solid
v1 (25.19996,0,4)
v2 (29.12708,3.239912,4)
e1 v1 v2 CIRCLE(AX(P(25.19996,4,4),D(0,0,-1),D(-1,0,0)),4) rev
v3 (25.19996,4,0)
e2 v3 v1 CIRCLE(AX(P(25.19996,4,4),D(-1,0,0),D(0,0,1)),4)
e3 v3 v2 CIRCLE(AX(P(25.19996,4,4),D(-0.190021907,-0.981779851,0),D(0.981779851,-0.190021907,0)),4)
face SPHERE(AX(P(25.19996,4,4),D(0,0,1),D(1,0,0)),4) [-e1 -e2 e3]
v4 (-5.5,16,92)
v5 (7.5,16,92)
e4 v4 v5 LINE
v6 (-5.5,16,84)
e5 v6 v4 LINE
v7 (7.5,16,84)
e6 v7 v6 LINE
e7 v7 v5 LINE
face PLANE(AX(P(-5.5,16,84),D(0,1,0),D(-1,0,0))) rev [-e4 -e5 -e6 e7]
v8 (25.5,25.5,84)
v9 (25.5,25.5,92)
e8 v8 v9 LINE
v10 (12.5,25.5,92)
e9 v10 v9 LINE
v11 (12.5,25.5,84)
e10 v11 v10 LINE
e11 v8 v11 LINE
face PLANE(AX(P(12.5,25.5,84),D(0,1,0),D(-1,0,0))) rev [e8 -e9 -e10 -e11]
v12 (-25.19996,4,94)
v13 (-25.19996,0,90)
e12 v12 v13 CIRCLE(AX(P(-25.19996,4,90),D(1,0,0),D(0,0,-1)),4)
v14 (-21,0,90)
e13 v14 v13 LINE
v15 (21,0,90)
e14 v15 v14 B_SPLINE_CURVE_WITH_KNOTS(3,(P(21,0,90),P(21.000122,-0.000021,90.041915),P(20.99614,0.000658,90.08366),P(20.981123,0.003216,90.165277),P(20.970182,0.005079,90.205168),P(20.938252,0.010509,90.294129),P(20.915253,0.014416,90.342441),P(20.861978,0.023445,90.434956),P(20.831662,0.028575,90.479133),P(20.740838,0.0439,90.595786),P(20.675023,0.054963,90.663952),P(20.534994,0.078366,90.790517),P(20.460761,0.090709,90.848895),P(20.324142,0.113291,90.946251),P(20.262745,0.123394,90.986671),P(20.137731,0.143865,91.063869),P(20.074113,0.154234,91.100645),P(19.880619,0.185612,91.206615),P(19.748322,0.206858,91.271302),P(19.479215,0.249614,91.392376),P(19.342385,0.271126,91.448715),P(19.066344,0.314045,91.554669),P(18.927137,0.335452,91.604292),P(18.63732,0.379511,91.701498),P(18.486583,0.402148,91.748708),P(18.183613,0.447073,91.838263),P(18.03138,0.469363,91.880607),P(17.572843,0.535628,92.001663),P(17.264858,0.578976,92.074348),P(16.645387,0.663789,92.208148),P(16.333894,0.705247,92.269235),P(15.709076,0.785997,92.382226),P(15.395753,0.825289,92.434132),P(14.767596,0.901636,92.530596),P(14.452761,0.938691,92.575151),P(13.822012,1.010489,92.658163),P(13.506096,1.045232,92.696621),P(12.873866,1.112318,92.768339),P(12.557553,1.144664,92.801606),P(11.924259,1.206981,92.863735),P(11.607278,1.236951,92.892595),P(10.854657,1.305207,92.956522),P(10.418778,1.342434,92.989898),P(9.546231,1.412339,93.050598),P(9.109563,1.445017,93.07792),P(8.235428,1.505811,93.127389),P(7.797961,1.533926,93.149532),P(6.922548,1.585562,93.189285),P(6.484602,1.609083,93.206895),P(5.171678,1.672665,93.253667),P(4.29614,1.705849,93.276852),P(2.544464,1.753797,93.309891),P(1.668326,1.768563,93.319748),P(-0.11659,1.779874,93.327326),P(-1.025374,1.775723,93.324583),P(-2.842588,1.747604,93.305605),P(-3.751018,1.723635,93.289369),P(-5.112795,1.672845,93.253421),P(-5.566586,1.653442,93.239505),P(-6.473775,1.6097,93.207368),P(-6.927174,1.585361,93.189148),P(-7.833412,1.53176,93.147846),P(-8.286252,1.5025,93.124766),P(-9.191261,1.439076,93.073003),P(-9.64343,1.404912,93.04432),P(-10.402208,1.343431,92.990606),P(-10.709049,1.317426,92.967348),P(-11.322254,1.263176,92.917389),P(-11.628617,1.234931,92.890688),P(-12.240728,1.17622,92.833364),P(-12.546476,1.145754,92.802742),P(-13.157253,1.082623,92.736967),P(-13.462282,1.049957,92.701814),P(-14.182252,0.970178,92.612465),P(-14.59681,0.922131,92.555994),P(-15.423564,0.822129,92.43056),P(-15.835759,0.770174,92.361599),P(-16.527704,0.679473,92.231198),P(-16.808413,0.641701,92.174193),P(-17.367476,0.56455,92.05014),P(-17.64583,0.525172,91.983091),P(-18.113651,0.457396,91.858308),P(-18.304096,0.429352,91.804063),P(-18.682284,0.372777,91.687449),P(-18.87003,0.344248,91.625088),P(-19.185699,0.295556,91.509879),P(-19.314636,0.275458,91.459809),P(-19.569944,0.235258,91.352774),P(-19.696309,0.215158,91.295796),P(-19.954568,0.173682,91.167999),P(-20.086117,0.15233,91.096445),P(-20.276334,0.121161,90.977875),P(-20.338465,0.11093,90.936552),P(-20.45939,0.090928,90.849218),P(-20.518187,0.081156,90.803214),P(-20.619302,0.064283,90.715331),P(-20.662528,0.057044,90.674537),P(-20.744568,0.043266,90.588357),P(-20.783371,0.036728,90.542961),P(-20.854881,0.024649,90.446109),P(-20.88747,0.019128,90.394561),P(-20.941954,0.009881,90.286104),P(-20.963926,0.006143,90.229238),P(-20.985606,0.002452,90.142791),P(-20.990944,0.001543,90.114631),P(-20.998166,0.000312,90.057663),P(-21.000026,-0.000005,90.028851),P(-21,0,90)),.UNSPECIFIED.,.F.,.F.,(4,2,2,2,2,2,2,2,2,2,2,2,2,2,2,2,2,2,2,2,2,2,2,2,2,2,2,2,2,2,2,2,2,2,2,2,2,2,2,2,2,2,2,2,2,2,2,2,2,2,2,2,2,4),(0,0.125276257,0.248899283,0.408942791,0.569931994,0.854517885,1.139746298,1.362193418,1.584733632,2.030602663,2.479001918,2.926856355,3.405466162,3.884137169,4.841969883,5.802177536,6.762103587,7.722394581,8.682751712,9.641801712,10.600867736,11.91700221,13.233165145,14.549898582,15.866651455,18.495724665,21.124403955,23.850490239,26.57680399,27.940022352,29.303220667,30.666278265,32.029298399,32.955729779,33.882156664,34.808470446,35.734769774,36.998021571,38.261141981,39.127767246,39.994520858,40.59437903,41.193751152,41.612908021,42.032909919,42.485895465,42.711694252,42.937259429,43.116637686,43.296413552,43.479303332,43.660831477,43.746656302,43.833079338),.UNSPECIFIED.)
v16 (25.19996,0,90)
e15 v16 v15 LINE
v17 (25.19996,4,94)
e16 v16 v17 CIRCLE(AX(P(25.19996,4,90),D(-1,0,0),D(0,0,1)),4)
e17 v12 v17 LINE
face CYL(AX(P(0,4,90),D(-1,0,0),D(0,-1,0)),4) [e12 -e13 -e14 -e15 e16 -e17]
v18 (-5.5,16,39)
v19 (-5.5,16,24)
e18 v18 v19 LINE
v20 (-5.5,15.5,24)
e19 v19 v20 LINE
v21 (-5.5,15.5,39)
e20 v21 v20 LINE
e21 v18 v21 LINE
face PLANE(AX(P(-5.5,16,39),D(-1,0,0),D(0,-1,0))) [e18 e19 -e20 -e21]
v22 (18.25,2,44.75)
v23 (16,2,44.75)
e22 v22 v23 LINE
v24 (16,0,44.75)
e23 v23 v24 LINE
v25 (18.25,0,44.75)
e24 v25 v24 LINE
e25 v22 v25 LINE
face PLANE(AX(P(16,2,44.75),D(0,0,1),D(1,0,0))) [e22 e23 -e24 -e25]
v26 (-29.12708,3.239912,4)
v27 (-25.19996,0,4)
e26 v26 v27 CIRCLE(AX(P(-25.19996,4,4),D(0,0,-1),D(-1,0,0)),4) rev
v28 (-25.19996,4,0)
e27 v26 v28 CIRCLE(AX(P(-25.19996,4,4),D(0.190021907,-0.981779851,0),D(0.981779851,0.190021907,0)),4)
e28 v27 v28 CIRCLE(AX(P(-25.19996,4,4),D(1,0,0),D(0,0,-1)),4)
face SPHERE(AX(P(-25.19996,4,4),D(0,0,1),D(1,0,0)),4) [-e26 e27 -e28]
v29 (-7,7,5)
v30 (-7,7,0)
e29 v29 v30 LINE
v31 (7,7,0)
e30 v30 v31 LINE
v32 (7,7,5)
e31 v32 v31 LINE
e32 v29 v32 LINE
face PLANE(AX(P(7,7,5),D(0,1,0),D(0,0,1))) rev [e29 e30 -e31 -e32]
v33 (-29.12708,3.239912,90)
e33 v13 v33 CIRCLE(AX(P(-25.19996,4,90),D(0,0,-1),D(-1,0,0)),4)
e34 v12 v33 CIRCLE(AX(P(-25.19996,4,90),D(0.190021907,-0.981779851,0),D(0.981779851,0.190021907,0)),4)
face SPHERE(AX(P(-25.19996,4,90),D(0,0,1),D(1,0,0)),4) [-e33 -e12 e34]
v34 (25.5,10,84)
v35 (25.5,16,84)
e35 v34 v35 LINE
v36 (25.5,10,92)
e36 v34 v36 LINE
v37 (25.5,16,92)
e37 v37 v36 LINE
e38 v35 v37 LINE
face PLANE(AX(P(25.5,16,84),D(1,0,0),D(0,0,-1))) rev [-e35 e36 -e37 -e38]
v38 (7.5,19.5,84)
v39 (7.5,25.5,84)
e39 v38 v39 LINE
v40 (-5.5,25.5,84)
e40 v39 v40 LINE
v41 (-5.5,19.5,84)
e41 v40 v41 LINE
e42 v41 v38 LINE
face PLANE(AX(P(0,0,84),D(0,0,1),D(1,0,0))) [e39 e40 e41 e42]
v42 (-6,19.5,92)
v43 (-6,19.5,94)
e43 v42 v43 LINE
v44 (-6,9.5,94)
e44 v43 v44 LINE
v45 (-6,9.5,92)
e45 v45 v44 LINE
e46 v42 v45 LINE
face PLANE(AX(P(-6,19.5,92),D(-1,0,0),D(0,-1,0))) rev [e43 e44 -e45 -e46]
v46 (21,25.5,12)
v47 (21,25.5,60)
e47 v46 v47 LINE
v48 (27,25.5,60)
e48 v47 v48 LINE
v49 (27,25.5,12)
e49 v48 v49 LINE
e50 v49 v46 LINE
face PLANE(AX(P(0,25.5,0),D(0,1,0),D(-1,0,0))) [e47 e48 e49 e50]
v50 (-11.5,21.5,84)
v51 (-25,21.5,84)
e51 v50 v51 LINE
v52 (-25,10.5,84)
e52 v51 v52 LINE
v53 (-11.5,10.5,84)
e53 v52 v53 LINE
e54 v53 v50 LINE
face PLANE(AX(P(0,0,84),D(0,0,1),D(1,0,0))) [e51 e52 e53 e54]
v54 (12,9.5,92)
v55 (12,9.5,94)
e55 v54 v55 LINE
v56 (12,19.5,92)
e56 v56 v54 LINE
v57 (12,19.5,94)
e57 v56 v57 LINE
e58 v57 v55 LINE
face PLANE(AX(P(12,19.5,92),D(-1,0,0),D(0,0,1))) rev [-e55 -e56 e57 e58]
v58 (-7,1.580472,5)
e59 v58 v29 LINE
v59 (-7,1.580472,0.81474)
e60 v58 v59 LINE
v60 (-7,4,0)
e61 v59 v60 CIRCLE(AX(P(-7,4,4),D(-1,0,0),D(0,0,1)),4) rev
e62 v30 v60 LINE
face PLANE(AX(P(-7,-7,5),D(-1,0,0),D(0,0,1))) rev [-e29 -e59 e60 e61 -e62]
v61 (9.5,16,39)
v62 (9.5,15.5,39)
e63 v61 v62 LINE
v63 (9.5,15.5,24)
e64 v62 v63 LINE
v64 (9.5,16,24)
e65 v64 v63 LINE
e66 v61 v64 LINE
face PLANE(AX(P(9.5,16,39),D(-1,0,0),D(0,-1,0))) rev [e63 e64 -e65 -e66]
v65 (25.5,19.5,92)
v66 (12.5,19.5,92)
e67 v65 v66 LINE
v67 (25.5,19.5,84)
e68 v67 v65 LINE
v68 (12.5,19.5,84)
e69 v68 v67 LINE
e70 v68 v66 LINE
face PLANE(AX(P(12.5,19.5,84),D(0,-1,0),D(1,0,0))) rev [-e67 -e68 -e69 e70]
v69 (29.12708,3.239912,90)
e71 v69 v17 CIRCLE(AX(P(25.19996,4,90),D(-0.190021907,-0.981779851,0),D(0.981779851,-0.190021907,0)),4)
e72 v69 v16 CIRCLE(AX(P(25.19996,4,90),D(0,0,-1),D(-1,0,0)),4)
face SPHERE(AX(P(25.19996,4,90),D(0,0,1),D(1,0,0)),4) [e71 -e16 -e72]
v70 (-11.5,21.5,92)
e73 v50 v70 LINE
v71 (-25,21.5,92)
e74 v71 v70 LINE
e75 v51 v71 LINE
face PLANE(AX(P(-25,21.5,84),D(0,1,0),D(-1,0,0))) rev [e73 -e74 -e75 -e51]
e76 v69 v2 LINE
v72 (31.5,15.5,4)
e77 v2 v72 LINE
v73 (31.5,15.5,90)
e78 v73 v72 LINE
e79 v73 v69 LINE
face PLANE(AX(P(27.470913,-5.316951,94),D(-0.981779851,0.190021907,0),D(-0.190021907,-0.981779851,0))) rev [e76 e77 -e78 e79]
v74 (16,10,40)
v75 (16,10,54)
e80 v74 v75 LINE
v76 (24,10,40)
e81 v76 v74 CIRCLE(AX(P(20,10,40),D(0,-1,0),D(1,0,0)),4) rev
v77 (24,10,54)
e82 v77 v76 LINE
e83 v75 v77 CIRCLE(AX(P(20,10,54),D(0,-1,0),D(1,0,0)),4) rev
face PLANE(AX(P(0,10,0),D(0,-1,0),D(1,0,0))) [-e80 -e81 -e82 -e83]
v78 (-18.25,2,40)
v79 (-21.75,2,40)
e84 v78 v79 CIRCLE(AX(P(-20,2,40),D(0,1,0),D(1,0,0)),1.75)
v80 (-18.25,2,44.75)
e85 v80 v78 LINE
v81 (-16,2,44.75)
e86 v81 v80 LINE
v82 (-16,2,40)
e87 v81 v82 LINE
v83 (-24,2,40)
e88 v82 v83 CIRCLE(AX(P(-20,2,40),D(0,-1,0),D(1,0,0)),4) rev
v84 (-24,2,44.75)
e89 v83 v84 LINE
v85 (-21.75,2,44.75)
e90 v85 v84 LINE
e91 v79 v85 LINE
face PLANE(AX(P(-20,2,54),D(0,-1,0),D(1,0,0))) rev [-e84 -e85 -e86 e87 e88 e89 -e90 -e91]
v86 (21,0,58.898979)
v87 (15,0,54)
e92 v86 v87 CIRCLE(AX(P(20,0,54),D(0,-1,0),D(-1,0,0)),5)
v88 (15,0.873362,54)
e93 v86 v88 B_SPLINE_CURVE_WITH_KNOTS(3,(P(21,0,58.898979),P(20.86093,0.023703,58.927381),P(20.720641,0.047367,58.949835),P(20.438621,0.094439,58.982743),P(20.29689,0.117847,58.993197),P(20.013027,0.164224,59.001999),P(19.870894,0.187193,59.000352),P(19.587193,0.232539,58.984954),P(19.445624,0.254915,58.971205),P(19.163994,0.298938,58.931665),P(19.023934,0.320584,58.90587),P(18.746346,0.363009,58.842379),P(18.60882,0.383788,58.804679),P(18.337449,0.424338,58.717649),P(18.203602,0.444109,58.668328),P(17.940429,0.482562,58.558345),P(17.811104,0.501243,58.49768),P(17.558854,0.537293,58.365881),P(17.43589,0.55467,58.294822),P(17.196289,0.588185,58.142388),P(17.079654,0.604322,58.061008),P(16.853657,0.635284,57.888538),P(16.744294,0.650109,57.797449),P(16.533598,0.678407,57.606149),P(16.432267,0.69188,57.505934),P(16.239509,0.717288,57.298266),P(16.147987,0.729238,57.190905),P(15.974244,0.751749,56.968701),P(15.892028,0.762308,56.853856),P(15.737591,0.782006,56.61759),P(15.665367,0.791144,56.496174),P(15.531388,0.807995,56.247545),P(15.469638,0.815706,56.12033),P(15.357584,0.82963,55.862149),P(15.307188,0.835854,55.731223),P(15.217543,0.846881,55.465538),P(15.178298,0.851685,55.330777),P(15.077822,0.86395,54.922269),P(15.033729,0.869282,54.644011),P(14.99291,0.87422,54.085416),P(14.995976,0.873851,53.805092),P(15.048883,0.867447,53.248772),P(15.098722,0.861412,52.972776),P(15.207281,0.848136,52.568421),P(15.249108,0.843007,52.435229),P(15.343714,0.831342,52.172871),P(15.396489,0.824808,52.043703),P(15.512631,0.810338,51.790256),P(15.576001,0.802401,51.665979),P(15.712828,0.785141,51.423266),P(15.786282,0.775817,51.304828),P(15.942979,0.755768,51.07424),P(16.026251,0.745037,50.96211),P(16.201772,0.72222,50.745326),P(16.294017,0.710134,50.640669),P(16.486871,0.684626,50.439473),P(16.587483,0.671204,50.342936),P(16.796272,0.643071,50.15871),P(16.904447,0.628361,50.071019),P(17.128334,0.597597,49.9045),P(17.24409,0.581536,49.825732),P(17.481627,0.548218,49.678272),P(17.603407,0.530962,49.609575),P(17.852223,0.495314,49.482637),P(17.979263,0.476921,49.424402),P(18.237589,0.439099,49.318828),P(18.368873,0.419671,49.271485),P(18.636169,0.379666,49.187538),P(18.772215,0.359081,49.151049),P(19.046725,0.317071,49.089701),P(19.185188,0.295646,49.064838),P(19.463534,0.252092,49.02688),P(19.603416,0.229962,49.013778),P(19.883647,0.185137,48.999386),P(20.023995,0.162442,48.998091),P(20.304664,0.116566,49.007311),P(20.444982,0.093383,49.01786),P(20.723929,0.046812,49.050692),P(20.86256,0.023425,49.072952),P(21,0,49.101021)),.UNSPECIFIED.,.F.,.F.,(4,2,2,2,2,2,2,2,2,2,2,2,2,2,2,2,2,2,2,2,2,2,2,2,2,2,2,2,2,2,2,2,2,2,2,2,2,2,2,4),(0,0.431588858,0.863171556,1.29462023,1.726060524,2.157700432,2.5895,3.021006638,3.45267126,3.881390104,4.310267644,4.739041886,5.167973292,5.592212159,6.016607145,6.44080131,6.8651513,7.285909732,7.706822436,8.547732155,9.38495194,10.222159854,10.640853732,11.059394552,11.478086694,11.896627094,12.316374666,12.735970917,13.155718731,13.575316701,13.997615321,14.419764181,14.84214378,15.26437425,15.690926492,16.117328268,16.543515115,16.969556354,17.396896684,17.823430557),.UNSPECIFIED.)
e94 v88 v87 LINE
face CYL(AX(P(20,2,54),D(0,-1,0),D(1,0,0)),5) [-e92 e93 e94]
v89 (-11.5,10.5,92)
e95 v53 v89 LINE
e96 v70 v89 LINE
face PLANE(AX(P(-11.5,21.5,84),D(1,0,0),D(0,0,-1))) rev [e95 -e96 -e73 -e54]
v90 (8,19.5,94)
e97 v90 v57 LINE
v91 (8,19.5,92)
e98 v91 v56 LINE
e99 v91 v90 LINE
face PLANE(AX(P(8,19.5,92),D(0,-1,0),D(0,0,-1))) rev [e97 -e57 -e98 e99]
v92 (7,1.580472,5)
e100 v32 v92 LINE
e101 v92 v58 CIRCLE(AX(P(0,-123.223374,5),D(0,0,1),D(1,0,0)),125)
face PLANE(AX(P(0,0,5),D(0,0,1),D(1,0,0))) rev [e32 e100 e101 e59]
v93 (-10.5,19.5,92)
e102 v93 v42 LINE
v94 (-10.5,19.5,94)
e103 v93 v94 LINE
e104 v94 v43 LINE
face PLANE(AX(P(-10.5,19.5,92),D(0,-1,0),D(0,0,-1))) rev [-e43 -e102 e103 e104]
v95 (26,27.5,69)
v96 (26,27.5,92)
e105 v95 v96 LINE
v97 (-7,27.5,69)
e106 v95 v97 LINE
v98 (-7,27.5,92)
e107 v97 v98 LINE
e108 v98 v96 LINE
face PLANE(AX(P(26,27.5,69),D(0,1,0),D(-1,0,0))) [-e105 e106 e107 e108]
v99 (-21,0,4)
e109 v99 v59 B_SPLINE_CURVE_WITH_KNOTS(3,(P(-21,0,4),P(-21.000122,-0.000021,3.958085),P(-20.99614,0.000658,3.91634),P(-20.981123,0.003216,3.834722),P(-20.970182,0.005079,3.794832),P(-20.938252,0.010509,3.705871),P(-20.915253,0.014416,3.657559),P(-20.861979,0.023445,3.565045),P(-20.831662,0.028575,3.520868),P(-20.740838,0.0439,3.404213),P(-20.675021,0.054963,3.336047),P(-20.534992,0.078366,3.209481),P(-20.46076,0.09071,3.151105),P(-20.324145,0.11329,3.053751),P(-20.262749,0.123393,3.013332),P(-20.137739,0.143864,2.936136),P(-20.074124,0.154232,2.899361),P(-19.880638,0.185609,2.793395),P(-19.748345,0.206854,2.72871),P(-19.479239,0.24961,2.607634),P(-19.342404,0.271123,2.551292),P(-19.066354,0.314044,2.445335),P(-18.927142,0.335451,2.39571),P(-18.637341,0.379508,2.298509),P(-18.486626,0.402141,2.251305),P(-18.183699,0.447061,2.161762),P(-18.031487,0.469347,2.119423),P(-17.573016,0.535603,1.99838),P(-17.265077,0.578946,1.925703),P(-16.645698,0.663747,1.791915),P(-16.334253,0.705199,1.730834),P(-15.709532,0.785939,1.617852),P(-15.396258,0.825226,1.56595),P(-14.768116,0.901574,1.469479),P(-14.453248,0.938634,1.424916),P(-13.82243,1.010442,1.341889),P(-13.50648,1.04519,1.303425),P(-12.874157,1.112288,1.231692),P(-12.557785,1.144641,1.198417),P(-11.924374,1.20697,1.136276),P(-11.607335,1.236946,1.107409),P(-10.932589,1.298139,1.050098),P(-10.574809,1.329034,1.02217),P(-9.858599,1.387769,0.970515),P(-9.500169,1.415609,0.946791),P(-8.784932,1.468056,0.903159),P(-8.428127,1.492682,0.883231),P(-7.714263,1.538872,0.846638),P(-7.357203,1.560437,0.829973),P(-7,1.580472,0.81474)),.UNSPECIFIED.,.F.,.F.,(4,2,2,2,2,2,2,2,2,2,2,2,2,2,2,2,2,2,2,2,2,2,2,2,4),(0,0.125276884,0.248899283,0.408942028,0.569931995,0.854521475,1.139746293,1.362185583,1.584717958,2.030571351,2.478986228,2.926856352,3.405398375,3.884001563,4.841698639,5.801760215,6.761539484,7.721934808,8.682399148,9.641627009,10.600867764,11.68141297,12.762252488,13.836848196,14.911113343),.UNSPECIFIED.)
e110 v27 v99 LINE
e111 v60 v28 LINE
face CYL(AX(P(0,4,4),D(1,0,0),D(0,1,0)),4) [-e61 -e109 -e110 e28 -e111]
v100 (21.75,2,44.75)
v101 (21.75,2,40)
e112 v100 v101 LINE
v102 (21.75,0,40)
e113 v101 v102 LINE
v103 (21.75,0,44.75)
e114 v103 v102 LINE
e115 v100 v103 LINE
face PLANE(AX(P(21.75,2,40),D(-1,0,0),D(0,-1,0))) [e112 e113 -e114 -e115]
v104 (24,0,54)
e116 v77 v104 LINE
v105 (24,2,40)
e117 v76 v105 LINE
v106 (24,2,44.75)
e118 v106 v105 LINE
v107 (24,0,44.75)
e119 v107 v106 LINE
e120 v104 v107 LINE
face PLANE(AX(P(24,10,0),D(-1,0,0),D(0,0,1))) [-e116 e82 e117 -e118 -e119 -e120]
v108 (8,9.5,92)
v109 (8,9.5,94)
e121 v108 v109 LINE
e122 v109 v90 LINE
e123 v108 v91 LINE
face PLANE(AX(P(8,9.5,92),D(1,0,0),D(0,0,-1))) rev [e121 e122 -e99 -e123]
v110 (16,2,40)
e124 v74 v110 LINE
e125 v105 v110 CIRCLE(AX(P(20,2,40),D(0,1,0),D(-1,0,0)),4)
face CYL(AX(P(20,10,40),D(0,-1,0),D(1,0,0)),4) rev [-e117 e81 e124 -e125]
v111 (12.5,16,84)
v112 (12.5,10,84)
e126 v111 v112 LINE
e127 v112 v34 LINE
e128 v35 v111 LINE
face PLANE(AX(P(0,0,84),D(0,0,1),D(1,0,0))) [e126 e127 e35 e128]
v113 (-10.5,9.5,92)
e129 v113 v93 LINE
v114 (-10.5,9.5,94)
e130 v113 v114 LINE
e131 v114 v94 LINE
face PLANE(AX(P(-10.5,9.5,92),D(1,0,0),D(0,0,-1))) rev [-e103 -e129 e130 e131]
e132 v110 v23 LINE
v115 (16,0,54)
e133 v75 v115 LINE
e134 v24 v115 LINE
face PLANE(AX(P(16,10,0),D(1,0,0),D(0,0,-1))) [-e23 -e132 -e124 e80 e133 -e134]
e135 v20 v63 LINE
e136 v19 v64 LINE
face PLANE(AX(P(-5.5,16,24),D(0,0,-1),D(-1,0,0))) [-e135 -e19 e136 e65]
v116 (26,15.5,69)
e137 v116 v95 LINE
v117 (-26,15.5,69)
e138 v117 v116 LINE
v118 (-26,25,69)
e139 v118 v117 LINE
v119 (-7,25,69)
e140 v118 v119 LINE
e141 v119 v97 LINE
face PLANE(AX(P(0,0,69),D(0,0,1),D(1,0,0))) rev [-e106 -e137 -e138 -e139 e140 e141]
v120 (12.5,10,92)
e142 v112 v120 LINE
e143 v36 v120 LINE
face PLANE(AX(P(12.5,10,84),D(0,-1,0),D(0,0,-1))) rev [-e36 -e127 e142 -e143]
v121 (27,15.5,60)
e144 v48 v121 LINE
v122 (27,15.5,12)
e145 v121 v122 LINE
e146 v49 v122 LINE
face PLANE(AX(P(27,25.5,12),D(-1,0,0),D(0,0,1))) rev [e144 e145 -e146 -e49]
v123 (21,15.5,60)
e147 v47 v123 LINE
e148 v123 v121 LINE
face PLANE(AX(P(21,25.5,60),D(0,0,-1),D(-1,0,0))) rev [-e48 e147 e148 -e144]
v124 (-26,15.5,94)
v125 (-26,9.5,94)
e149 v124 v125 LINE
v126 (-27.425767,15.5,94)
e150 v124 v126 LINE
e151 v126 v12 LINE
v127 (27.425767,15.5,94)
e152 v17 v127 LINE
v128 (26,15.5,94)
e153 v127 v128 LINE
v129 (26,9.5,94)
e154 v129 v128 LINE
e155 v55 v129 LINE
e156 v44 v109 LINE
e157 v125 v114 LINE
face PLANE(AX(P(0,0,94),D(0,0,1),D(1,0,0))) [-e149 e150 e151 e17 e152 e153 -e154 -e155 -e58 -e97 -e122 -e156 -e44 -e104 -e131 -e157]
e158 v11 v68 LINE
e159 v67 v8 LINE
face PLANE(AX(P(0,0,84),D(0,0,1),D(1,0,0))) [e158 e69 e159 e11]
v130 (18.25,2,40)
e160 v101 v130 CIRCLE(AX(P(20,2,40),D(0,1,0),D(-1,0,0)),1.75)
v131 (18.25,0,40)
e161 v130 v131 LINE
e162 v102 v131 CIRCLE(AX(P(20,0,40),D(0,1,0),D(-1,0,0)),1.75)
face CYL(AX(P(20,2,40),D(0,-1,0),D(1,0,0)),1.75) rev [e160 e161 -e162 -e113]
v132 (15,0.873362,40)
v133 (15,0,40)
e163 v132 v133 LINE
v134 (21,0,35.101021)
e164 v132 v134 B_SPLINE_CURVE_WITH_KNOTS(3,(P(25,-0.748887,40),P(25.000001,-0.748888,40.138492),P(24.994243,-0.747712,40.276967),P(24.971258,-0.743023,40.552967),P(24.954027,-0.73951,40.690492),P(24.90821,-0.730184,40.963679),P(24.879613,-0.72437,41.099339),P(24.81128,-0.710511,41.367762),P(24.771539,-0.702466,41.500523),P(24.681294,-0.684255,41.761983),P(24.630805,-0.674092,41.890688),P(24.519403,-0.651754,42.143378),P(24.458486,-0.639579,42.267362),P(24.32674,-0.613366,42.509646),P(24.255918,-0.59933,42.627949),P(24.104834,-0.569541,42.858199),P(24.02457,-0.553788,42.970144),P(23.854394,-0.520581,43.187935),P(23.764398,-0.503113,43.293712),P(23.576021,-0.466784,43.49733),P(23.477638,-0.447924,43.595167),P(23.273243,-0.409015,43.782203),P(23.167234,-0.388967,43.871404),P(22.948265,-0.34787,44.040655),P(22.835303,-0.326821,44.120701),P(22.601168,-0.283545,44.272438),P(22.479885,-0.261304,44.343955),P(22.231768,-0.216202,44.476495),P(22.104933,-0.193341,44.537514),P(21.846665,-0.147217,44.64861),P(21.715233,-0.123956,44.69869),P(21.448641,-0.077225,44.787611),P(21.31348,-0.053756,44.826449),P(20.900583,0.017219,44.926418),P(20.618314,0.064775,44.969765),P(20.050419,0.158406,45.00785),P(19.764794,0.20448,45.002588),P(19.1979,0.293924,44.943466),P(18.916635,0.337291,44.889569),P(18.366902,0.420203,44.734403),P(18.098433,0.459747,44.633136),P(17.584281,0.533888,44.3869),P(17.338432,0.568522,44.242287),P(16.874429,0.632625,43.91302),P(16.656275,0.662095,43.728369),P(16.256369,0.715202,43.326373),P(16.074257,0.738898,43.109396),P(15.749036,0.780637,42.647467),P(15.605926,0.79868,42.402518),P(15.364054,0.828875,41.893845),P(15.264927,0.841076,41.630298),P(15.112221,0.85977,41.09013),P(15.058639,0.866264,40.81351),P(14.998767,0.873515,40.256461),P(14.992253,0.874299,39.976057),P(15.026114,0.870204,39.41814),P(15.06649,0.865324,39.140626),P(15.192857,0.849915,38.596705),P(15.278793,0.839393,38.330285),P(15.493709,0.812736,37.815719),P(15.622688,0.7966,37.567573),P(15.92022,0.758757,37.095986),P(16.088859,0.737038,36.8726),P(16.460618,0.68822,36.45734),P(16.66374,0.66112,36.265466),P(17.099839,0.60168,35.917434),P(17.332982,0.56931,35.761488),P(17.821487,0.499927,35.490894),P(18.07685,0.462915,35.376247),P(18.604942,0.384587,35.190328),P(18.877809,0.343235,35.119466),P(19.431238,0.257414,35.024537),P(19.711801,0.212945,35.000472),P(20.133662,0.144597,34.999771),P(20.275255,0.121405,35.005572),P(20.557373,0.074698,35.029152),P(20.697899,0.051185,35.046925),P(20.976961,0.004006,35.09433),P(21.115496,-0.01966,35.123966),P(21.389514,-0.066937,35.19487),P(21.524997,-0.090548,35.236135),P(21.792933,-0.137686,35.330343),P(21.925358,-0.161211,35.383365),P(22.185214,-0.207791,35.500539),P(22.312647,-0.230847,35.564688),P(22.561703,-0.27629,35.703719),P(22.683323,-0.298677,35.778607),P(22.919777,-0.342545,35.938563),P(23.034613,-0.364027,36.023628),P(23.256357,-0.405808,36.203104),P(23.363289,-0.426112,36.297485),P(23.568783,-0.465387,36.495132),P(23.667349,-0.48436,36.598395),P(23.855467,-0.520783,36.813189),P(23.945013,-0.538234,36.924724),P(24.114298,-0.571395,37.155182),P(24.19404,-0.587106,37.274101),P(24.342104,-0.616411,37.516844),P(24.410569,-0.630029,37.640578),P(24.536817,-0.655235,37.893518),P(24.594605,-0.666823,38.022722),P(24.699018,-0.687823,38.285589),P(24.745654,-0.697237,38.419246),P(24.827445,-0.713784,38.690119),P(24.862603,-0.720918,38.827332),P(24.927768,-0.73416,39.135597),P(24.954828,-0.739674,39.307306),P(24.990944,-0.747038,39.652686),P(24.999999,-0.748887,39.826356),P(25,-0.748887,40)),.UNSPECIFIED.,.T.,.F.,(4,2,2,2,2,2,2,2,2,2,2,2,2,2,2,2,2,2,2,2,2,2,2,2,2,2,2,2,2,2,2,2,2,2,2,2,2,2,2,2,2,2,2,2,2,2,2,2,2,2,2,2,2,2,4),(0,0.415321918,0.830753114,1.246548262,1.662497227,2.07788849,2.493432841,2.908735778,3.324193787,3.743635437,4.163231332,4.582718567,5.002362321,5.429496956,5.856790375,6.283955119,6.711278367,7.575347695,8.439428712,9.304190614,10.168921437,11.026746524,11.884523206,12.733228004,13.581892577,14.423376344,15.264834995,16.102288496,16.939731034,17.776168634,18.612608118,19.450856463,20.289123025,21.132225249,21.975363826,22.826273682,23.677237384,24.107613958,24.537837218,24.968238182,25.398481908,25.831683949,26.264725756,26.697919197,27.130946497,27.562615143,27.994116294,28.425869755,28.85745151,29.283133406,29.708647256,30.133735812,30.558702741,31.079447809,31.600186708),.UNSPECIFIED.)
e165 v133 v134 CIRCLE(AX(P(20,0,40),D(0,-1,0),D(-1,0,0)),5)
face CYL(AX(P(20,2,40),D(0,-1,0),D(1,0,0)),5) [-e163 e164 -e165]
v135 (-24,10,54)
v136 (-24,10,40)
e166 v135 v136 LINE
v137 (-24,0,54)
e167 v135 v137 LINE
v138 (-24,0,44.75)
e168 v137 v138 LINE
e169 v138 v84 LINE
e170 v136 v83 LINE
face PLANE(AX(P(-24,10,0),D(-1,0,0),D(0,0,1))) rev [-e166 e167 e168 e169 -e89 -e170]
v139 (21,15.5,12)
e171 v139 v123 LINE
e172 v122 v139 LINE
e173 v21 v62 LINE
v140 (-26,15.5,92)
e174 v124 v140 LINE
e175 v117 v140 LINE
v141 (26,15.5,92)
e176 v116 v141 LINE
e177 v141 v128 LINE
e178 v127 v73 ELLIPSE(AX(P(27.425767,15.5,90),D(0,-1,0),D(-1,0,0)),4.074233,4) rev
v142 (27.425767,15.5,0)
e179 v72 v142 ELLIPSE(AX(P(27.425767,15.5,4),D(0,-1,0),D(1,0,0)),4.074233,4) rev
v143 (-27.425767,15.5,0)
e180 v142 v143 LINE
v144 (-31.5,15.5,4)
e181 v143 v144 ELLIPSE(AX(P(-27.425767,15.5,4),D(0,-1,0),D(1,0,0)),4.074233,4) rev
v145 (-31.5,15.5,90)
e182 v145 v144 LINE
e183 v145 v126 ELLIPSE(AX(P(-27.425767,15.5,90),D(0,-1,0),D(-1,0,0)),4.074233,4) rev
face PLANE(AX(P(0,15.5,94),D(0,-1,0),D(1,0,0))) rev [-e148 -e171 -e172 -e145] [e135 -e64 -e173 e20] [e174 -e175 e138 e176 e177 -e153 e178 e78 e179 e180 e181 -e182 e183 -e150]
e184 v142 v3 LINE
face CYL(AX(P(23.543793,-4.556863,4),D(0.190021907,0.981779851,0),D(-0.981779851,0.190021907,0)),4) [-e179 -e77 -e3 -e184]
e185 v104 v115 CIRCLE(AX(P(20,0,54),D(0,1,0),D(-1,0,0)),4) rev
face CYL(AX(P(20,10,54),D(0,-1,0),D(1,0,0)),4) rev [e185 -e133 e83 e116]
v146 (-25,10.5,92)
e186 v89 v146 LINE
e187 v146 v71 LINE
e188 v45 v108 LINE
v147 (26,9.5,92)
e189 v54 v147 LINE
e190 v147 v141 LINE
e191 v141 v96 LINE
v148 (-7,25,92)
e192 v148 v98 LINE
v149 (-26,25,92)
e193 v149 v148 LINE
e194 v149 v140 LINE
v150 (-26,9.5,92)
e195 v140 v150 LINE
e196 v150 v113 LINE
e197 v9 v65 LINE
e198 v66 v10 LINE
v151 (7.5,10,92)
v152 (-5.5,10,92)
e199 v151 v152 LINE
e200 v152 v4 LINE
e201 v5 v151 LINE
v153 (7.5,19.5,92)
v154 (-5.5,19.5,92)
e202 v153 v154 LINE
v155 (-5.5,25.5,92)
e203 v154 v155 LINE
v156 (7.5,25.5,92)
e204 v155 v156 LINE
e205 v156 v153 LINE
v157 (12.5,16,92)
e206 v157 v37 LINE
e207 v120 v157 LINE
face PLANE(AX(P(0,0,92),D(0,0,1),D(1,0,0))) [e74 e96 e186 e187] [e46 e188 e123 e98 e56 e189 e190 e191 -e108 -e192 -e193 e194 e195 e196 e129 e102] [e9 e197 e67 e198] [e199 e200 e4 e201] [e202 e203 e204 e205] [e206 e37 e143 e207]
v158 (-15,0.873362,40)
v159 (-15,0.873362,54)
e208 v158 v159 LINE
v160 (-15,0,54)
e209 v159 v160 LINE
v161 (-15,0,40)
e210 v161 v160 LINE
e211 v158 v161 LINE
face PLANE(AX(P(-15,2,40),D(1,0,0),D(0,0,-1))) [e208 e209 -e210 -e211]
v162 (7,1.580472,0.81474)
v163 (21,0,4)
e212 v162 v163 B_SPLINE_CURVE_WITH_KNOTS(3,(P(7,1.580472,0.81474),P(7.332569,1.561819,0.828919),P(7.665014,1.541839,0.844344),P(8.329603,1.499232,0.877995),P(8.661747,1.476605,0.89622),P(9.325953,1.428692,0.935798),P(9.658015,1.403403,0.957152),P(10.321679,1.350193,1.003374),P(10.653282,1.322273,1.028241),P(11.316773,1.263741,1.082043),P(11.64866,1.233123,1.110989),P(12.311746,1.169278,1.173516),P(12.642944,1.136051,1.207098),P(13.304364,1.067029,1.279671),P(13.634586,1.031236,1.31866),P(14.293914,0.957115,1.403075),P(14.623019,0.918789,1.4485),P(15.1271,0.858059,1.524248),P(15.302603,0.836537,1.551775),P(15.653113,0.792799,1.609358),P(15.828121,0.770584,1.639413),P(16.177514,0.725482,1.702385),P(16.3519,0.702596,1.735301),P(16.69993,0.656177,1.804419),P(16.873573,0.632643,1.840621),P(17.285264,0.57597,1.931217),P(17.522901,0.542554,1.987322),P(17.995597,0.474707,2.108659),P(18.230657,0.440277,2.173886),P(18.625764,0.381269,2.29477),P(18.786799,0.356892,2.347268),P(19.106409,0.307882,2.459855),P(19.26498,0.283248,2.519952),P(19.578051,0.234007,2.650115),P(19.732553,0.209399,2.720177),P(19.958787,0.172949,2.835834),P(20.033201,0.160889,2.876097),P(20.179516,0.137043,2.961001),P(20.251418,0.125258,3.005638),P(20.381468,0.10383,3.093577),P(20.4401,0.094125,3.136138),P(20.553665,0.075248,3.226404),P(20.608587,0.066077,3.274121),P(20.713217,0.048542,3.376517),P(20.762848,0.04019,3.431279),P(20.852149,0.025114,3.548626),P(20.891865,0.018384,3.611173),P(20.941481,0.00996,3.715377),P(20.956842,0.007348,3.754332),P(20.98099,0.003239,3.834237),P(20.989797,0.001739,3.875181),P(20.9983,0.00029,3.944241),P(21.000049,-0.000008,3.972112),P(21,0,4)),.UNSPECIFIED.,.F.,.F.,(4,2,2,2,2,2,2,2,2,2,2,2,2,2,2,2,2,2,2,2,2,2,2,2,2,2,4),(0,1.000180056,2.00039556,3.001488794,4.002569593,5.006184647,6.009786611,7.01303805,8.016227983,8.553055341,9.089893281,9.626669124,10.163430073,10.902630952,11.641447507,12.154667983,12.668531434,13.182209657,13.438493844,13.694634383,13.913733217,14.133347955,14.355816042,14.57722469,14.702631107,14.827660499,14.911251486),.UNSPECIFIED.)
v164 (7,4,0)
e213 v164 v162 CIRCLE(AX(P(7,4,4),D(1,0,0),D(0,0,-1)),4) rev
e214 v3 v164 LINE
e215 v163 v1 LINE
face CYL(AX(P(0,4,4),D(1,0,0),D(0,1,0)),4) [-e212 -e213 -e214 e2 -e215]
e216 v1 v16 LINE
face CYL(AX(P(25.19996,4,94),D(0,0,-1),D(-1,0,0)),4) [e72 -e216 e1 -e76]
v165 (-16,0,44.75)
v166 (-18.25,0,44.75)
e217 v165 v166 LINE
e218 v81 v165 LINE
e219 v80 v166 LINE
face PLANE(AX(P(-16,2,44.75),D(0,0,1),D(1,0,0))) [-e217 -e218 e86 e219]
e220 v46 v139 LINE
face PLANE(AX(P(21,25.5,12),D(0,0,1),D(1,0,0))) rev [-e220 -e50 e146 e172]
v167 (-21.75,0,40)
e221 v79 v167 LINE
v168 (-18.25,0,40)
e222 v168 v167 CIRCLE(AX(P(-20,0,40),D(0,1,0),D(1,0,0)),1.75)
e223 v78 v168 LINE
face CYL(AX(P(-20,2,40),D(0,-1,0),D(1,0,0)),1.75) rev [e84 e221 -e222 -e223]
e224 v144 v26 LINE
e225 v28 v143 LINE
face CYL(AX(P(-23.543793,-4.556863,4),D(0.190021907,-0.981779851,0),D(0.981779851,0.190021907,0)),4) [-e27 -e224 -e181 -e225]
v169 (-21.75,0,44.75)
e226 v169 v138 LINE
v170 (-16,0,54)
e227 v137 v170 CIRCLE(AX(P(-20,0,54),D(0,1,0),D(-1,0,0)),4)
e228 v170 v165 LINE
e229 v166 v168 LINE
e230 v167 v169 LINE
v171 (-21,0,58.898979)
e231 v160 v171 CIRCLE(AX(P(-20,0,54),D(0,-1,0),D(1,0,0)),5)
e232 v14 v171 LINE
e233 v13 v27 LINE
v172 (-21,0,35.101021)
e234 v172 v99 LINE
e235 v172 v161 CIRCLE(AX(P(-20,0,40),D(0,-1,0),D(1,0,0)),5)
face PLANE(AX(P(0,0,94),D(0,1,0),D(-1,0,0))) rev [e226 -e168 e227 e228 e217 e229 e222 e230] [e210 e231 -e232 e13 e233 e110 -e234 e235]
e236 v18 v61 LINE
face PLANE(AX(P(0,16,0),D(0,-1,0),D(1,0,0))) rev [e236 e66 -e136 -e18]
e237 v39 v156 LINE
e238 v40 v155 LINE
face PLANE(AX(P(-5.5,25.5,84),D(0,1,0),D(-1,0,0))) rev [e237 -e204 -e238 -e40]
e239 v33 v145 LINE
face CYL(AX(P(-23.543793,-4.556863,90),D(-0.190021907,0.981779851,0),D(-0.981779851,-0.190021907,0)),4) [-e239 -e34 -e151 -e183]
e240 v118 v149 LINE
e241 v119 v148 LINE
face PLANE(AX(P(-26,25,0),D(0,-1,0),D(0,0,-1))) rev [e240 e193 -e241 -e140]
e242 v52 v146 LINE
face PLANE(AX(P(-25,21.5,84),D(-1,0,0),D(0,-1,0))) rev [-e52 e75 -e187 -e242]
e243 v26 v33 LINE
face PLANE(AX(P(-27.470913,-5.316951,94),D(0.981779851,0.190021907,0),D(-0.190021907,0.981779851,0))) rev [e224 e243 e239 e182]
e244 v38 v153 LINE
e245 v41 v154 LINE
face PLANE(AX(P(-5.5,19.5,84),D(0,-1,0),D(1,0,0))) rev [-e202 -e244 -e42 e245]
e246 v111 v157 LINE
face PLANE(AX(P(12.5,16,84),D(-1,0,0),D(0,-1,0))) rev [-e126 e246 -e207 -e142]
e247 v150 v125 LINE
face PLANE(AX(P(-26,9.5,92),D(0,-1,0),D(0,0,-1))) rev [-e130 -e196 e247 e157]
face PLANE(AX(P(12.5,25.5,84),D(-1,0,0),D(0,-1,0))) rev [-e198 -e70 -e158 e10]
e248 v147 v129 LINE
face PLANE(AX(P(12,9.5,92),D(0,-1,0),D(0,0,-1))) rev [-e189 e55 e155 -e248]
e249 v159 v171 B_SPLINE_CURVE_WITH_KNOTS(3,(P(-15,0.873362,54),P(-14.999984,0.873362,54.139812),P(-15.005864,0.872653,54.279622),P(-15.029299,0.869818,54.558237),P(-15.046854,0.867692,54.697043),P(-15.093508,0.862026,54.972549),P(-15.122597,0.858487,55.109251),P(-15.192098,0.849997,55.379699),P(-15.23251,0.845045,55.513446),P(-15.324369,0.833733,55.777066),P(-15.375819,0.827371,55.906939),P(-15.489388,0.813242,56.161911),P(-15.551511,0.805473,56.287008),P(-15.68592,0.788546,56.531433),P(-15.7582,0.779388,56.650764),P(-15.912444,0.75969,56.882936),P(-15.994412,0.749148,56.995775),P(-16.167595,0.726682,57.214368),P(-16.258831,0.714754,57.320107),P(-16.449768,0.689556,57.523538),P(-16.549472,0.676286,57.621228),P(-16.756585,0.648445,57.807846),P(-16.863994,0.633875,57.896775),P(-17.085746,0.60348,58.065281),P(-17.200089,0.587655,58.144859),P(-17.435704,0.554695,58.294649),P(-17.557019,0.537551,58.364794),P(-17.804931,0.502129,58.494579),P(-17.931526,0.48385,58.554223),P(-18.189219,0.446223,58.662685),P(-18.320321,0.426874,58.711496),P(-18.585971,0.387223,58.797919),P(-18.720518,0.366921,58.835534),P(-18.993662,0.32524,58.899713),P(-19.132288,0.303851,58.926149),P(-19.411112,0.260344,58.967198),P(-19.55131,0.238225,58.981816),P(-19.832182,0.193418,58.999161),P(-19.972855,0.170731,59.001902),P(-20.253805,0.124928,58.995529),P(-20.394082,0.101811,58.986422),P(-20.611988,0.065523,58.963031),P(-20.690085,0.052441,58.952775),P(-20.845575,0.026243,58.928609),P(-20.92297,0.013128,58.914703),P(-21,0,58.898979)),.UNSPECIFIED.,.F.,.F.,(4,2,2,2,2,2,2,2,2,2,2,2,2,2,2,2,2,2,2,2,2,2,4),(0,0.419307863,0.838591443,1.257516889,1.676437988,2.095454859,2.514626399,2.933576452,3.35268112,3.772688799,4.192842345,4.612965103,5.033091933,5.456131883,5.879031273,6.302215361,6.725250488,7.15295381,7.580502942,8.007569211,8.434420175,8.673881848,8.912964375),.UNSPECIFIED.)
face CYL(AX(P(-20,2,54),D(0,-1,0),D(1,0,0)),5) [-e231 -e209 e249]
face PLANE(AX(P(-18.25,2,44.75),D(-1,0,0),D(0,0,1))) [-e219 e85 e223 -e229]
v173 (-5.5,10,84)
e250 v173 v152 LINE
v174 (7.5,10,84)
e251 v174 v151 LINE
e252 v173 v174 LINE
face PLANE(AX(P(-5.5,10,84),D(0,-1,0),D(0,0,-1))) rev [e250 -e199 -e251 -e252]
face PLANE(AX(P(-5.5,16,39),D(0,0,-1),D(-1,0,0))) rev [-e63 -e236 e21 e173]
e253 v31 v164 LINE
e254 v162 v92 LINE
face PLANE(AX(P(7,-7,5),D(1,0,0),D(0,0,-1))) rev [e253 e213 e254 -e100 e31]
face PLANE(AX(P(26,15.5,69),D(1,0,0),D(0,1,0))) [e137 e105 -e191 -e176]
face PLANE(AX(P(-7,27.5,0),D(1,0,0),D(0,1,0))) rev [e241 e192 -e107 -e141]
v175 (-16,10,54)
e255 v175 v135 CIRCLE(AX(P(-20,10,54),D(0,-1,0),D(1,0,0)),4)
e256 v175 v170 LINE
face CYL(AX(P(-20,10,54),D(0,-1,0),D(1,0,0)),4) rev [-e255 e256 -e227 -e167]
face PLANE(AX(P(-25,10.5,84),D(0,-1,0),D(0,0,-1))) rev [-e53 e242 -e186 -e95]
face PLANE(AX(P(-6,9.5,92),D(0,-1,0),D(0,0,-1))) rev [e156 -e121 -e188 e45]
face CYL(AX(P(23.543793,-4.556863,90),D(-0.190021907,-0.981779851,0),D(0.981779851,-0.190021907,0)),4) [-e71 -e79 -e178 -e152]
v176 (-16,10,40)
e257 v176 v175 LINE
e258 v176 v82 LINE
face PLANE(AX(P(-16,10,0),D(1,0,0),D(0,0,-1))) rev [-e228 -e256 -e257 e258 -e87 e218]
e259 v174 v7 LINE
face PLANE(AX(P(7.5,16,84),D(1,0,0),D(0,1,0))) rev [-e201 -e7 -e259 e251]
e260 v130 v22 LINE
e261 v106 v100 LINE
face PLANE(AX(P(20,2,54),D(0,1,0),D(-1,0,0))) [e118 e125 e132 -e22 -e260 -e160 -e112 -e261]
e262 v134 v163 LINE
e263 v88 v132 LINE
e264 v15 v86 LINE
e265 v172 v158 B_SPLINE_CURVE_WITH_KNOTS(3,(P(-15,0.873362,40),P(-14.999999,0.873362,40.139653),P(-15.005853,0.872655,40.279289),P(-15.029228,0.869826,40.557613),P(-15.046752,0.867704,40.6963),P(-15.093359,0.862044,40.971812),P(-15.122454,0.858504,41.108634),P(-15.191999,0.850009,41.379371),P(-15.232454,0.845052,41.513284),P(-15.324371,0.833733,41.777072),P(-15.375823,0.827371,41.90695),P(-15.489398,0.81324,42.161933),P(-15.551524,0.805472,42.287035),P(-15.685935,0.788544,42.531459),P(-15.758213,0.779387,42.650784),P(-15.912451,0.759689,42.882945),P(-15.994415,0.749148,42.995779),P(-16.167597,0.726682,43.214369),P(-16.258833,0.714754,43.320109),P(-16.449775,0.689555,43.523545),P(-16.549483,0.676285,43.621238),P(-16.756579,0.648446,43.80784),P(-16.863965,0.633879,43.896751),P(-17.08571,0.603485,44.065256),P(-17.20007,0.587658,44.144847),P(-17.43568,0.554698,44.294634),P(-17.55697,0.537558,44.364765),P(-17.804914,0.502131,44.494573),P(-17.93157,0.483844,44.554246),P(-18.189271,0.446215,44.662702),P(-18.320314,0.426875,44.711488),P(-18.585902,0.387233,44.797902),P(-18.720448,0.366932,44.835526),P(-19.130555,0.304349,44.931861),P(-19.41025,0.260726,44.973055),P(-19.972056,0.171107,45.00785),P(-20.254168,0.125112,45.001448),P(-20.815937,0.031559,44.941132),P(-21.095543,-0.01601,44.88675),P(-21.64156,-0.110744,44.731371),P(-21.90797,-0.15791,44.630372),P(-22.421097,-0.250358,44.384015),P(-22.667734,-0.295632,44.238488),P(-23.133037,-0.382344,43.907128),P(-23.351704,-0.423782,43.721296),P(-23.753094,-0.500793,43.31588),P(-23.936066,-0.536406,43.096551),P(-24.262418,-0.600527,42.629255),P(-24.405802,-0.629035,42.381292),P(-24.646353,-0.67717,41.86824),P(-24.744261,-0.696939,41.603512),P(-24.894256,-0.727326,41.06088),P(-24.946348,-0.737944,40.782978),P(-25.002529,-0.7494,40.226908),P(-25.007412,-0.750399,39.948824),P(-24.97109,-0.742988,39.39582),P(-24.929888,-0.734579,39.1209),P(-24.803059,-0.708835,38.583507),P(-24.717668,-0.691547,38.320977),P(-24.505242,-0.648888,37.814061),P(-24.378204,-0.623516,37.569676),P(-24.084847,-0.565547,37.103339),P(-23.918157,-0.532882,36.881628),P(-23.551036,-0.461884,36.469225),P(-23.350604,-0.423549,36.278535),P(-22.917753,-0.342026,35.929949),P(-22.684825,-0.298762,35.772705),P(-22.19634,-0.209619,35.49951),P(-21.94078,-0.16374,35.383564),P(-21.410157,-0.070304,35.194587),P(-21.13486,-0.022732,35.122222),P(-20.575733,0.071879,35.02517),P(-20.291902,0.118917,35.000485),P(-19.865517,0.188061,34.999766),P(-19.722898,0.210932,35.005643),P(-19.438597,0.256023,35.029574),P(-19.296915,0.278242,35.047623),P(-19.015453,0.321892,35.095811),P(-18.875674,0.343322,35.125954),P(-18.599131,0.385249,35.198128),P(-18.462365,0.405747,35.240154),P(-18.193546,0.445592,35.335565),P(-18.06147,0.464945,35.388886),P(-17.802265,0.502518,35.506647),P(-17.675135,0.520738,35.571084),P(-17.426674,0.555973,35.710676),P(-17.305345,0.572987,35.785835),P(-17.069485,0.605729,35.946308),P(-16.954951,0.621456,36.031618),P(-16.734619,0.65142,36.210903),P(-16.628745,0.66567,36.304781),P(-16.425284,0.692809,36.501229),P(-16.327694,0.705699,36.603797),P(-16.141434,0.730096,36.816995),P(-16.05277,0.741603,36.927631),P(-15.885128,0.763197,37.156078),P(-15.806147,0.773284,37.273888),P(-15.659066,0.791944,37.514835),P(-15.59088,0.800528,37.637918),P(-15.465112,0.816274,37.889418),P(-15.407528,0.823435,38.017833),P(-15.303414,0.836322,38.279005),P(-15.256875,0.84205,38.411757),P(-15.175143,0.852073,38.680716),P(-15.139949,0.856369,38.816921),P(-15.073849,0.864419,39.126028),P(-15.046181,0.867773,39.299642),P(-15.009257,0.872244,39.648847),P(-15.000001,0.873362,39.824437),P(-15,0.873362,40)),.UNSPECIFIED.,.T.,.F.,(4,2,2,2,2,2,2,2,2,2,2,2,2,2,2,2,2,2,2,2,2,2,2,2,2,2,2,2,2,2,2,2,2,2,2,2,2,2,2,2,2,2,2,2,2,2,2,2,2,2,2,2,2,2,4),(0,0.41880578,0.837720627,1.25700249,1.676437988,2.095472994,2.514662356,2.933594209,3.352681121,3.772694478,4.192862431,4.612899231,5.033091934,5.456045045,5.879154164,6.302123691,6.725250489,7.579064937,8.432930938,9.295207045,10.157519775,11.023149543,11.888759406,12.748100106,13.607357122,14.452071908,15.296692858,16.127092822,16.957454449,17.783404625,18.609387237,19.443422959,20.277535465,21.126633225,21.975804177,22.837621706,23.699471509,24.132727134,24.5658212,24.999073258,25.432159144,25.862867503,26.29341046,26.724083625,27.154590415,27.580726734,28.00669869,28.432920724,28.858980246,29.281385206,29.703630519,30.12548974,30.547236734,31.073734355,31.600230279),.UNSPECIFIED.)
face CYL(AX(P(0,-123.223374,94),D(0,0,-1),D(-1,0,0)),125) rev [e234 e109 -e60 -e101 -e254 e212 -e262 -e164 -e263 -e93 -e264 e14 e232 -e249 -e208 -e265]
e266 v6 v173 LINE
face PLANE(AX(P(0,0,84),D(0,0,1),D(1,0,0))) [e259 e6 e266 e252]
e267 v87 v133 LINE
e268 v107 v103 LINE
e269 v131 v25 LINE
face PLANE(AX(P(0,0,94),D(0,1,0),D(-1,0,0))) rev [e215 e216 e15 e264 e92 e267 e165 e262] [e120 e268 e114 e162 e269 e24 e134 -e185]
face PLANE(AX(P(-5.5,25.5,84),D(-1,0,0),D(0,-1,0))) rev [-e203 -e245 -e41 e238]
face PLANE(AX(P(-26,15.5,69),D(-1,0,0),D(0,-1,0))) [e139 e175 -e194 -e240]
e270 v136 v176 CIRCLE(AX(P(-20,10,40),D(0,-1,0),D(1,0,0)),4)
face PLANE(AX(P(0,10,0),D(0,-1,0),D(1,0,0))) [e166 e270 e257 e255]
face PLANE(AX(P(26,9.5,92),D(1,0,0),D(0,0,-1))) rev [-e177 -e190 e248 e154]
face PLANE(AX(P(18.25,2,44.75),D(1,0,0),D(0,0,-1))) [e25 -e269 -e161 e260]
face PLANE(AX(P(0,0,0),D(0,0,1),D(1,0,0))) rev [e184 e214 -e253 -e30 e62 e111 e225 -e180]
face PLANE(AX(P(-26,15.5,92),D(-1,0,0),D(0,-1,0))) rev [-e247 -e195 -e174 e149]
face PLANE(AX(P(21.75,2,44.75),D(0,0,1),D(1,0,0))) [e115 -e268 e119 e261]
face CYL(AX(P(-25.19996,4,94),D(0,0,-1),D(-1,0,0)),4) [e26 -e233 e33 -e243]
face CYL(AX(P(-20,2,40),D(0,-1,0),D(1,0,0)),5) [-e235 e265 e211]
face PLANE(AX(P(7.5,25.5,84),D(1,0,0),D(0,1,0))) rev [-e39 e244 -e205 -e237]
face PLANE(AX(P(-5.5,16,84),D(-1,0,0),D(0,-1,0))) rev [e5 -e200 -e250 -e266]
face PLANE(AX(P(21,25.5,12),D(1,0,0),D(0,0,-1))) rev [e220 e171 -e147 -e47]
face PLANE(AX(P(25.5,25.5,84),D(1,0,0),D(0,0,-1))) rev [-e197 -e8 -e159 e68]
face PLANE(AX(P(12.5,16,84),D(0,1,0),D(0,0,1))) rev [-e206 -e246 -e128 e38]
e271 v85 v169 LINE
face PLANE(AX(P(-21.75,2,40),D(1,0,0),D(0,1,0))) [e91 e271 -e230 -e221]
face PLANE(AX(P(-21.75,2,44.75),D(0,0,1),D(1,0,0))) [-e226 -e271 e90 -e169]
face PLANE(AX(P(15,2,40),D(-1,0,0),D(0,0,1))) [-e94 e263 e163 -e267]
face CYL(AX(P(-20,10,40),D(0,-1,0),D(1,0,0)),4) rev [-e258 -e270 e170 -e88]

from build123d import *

# Parameters (mm, degrees)
BOSS_EXTRUDE1_DEPTH = 94
SKETCH2_W           = 14
SKETCH2_H           = 14
CUT_EXTRUDE1_DEPTH  = 5
SKETCH3_W           = 52
SKETCH3_H           = 12
BOSS_EXTRUDE2_DEPTH = 25
SKETCH4_W           = 6
SKETCH4_H           = 48
BOSS_EXTRUDE3_DEPTH = 10
SKETCH5_W           = 13.5
SKETCH5_H           = 11
SKETCH5_W_2         = 13
SKETCH5_H_2         = 6
CUT_EXTRUDE2_DEPTH  = 10
CUT_EXTRUDE3_DEPTH  = 2
SKETCH7_W           = 19
SKETCH7_H           = 2.5
CUT_EXTRUDE4_DEPTH  = 102.056914657
SKETCH8_R           = 4
CUT_EXTRUDE5_DEPTH  = 10
BOSS_EXTRUDE5_DEPTH = 2
FILLET2_R           = 4
FILLET3_R           = 4
SKETCH10_W          = 15
SKETCH10_H          = 15
BOSS_EXTRUDE6_DEPTH = 0.5


# Some blends are built 0.0001 mm under size
with BuildPart() as part:
    # Sketch1 → Boss-Extrude1 (new body)
    with BuildSketch(Plane.XY):
        with BuildLine():
            Line((-31.5, 15.5), (-28.5, 0))
            Line((-28.5, 0), (-21, 0))
            ThreePointArc((-21, 0), (0, 1.776625594), (21, 0))
            Line((21, 0), (28.5, 0))
            Line((28.5, 0), (31.5, 15.5))
            Line((31.5, 15.5), (-31.5, 15.5))
        make_face()
    extrude(amount=BOSS_EXTRUDE1_DEPTH)

    # Sketch2 → Cut-Extrude1 (cut)
    with BuildSketch(Plane(origin=(0, 0, 0), x_dir=(-1, 0, 0), z_dir=(0, 0, -1))):
        Rectangle(SKETCH2_W, SKETCH2_H)
    extrude(amount=-CUT_EXTRUDE1_DEPTH, mode=Mode.SUBTRACT)

    # Sketch3 → Boss-Extrude2 (add)
    with BuildSketch(Plane.XY.offset(94)):
        with Locations((0, 21.5)):
            Rectangle(SKETCH3_W, SKETCH3_H)
    extrude(amount=-BOSS_EXTRUDE2_DEPTH)

    # Sketch4 → Boss-Extrude3 (add)
    with BuildSketch(Plane(origin=(0, 15.5, 0), x_dir=(1, 0, 0), z_dir=(0, 1, 0))):
        with Locations((24, -36)):
            Rectangle(SKETCH4_W, SKETCH4_H)
    extrude(amount=BOSS_EXTRUDE3_DEPTH)

    # Sketch5 → Cut-Extrude2 (cut)
    with BuildSketch(Plane.XY.offset(94)):
        with Locations((-18.25, 16)):
            Rectangle(SKETCH5_W, SKETCH5_H)
        with Locations((1, 22.5)):
            Rectangle(SKETCH5_W_2, SKETCH5_H_2)
        with Locations((19, 22.5)):
            Rectangle(SKETCH5_W_2, SKETCH5_H_2)
        with Locations((1, 13)):
            Rectangle(SKETCH5_W_2, SKETCH5_H_2)
        with Locations((19, 13)):
            Rectangle(SKETCH5_W_2, SKETCH5_H_2)
    extrude(amount=-CUT_EXTRUDE2_DEPTH, mode=Mode.SUBTRACT)

    # Sketch6 → Cut-Extrude3 (cut)
    with BuildSketch(Plane.XY.offset(94)):
        Polygon((-26, 15.5), (-26, 9.5), (-10.5, 9.5), (-10.5, 19.5), (-6, 19.5), (-6, 9.5), (8, 9.5), (8, 19.5), (12, 19.5), (12, 9.5), (26, 9.5), (26, 33.954249065), (-26, 33.954249065), align=None)
    extrude(amount=-CUT_EXTRUDE3_DEPTH, mode=Mode.SUBTRACT)

    # Sketch7 → Cut-Extrude4 (cut, through all)
    with BuildSketch(Plane.XY.offset(92)):
        with Locations((-16.5, 26.25)):
            Rectangle(SKETCH7_W, SKETCH7_H)
    extrude(amount=-CUT_EXTRUDE4_DEPTH, mode=Mode.SUBTRACT)

    # Sketch8 → Cut-Extrude5 (cut)
    with BuildSketch(Plane.XZ):
        with BuildLine():
            ThreePointArc((-21, 57.872983346), (-23.16227766, 56.449489743), (-24, 54))
            ThreePointArc((-24, 54), (-23.16227766, 51.550510257), (-21, 50.127016654))
            Line((-21, 50.127016654), (-21, 57.872983346))
        make_face()
        with BuildLine():
            ThreePointArc((-16, 54), (-17.550510257, 57.16227766), (-21, 57.872983346))
            Line((-21, 57.872983346), (-21, 50.127016654))
            ThreePointArc((-21, 50.127016654), (-17.550510257, 50.83772234), (-16, 54))
        make_face()
        with BuildLine():
            ThreePointArc((-21, 43.872983346), (-23.16227766, 42.449489743), (-24, 40))
            ThreePointArc((-24, 40), (-23.16227766, 37.550510257), (-21, 36.127016654))
            Line((-21, 36.127016654), (-21, 43.872983346))
        make_face()
        with BuildLine():
            ThreePointArc((-16, 40), (-17.550510257, 43.16227766), (-21, 43.872983346))
            Line((-21, 43.872983346), (-21, 36.127016654))
            ThreePointArc((-21, 36.127016654), (-17.550510257, 36.83772234), (-16, 40))
        make_face()
        with BuildLine():
            ThreePointArc((-16, 54), (-17.550510257, 50.83772234), (-21, 50.127016654))
            Line((-21, 50.127016654), (-21, 43.872983346))
            ThreePointArc((-21, 43.872983346), (-17.550510257, 43.16227766), (-16, 40))
            Line((-16, 40), (-16, 54))
        make_face()
        with BuildLine():
            ThreePointArc((-21, 50.127016654), (-23.16227766, 51.550510257), (-24, 54))
            Line((-24, 54), (-24, 40))
            ThreePointArc((-24, 40), (-23.16227766, 42.449489743), (-21, 43.872983346))
            Line((-21, 43.872983346), (-21, 50.127016654))
        make_face()
        with Locations((20, 54)):
            Circle(SKETCH8_R)
        with BuildLine():
            Line((24, 40), (24, 54))
            ThreePointArc((24, 54), (20, 50), (16, 54))
            Line((16, 54), (16, 40))
            ThreePointArc((16, 40), (20, 44), (24, 40))
        make_face()
        with Locations((20, 40)):
            Circle(SKETCH8_R)
    extrude(amount=-CUT_EXTRUDE5_DEPTH, mode=Mode.SUBTRACT)

    # Sketch9 → Boss-Extrude5 (add)
    with BuildSketch(Plane.XZ):
        with BuildLine():
            Line((-15, 40), (-15, 54))
            ThreePointArc((-15, 54), (-16.83772234, 57.872983346), (-21, 58.898979486))
            Line((-21, 58.898979486), (-21, 57.872983346))
            ThreePointArc((-21, 57.872983346), (-17.550510257, 57.16227766), (-16, 54))
            Line((-16, 54), (-16, 44.75))
            Line((-16, 44.75), (-18.25, 44.75))
            Line((-18.25, 44.75), (-18.25, 40))
            ThreePointArc((-18.25, 40), (-20, 38.25), (-21.75, 40))
            Line((-21.75, 40), (-21.75, 44.75))
            Line((-21.75, 44.75), (-25, 44.75))
            Line((-25, 44.75), (-25, 40))
            ThreePointArc((-25, 40), (-20, 35), (-15, 40))
        make_face()
        with BuildLine():
            Line((16, 44.75), (18.25, 44.75))
            Line((18.25, 44.75), (18.25, 40))
            ThreePointArc((18.25, 40), (20, 38.25), (21.75, 40))
            Line((21.75, 40), (21.75, 44.75))
            Line((21.75, 44.75), (25, 44.75))
            Line((25, 44.75), (25, 40))
            ThreePointArc((25, 40), (20, 35), (15, 40))
            Line((15, 40), (15, 54))
            ThreePointArc((15, 54), (16.83772234, 57.872983346), (21, 58.898979486))
            Line((21, 58.898979486), (21, 57.872983346))
            ThreePointArc((21, 57.872983346), (17.550510257, 57.16227766), (16, 54))
            Line((16, 54), (16, 44.75))
        make_face()
    extrude(amount=-BOSS_EXTRUDE5_DEPTH)

    # Fillet2
    fillet2_edges = [part.edges().sort_by_distance(p)[0] for p in [
        (-28.5, 0, 47),
        (28.5, 0, 47),
    ]]
    fillet(fillet2_edges, radius=FILLET2_R)

    # Fillet3
    fillet3_edges = [part.edges().sort_by_distance(p)[0] for p in [
        (30.313539907, 9.369956187, 0),
        (27.745510401, 0.914521876, 0),
        (23.099980206, 0, 0),
    ]]
    fillet(fillet3_edges, radius=FILLET3_R)
    fillet3_2_edges = [part.edges().sort_by_distance(p)[0] for p in [
        (-30.313539907, 9.369956187, 0),
        (-27.745510401, 0.914521876, 0),
        (-23.099980206, 0, 0),
    ]]
    fillet(fillet3_2_edges, radius=FILLET3_R)
    # the kernel refuses this fillet: 4 mm, written as the material it takes off along each edge
    with BuildSketch(Plane(origin=(29.127079814, 3.239912374, 94), x_dir=(0, 0, -1), z_dir=(0.19002190656586074, 0.9817798505902814, 0))) as fillet3_3_piece_1:
        with BuildLine():
            CenterArc((FILLET3_R, FILLET3_R), FILLET3_R, 180, 90)
            Line((0, FILLET3_R), (-FILLET3_R * 0.02, FILLET3_R))
            Line((-FILLET3_R * 0.02, FILLET3_R), (-FILLET3_R * 0.02, -FILLET3_R * 0.02))
            Line((-FILLET3_R * 0.02, -FILLET3_R * 0.02), (FILLET3_R, -FILLET3_R * 0.02))
            Line((FILLET3_R, -FILLET3_R * 0.02), (FILLET3_R, 0))
        make_face()
    extrude(amount=22.487613816, mode=Mode.SUBTRACT)
    with BuildSketch(Plane(origin=(25.199960412, 4, 94), x_dir=(0, -1, 0), z_dir=(-1, 0, 0))) as fillet3_3_piece_2:
        with BuildLine():
            CenterArc((4 - FILLET3_R, -FILLET3_R), FILLET3_R, 0, 90)
            Line((4, -FILLET3_R), (4 + FILLET3_R * 0.02, -FILLET3_R))
            Line((4 + FILLET3_R * 0.02, -FILLET3_R), (4 + FILLET3_R * 0.02, 0))
            Line((4 + FILLET3_R * 0.02, 0), (4, FILLET3_R * 0.02))
            Line((4, FILLET3_R * 0.02), (4 - FILLET3_R, FILLET3_R * 0.02))
            Line((4 - FILLET3_R, FILLET3_R * 0.02), (4 - FILLET3_R, 0))
        make_face()
    revolve(axis=Axis((25.199960412, 4, 94), (0, 0, 1)), revolution_arc=79.045937357, mode=Mode.SUBTRACT)
    with BuildSketch(Plane(origin=(11, 0, 94), x_dir=(0, 1, 0), z_dir=(1, 0, 0))) as fillet3_3_piece_3:
        with BuildLine():
            CenterArc((FILLET3_R, -FILLET3_R), FILLET3_R, 90, 90)
            Line((0, -FILLET3_R), (-FILLET3_R * 0.02, -FILLET3_R))
            Line((-FILLET3_R * 0.02, -FILLET3_R), (-FILLET3_R * 0.02, FILLET3_R * 0.02))
            Line((-FILLET3_R * 0.02, FILLET3_R * 0.02), (FILLET3_R, FILLET3_R * 0.02))
            Line((FILLET3_R, FILLET3_R * 0.02), (FILLET3_R, 0))
        make_face()
    extrude(amount=14.199960412, mode=Mode.SUBTRACT)
    fillet3_4_edges = [part.edges().sort_by_distance(p)[0] for p in [
        (-30.313539907, 9.369956187, 94),
        (-27.745510401, 0.914521876, 94),
        (-23.099980206, 0, 94),
    ]]
    fillet(fillet3_4_edges, radius=FILLET3_R - 0.0001)  # a hair under: the kernel refuses the full size

    # Sketch10 → Boss-Extrude6 (add)
    with BuildSketch(Plane(origin=(0, 15.5, 0), x_dir=(1, 0, 0), z_dir=(0, 1, 0))):
        with Locations((2, -31.5)):
            Rectangle(SKETCH10_W, SKETCH10_H)
    extrude(amount=BOSS_EXTRUDE6_DEPTH)


solid = part.part
